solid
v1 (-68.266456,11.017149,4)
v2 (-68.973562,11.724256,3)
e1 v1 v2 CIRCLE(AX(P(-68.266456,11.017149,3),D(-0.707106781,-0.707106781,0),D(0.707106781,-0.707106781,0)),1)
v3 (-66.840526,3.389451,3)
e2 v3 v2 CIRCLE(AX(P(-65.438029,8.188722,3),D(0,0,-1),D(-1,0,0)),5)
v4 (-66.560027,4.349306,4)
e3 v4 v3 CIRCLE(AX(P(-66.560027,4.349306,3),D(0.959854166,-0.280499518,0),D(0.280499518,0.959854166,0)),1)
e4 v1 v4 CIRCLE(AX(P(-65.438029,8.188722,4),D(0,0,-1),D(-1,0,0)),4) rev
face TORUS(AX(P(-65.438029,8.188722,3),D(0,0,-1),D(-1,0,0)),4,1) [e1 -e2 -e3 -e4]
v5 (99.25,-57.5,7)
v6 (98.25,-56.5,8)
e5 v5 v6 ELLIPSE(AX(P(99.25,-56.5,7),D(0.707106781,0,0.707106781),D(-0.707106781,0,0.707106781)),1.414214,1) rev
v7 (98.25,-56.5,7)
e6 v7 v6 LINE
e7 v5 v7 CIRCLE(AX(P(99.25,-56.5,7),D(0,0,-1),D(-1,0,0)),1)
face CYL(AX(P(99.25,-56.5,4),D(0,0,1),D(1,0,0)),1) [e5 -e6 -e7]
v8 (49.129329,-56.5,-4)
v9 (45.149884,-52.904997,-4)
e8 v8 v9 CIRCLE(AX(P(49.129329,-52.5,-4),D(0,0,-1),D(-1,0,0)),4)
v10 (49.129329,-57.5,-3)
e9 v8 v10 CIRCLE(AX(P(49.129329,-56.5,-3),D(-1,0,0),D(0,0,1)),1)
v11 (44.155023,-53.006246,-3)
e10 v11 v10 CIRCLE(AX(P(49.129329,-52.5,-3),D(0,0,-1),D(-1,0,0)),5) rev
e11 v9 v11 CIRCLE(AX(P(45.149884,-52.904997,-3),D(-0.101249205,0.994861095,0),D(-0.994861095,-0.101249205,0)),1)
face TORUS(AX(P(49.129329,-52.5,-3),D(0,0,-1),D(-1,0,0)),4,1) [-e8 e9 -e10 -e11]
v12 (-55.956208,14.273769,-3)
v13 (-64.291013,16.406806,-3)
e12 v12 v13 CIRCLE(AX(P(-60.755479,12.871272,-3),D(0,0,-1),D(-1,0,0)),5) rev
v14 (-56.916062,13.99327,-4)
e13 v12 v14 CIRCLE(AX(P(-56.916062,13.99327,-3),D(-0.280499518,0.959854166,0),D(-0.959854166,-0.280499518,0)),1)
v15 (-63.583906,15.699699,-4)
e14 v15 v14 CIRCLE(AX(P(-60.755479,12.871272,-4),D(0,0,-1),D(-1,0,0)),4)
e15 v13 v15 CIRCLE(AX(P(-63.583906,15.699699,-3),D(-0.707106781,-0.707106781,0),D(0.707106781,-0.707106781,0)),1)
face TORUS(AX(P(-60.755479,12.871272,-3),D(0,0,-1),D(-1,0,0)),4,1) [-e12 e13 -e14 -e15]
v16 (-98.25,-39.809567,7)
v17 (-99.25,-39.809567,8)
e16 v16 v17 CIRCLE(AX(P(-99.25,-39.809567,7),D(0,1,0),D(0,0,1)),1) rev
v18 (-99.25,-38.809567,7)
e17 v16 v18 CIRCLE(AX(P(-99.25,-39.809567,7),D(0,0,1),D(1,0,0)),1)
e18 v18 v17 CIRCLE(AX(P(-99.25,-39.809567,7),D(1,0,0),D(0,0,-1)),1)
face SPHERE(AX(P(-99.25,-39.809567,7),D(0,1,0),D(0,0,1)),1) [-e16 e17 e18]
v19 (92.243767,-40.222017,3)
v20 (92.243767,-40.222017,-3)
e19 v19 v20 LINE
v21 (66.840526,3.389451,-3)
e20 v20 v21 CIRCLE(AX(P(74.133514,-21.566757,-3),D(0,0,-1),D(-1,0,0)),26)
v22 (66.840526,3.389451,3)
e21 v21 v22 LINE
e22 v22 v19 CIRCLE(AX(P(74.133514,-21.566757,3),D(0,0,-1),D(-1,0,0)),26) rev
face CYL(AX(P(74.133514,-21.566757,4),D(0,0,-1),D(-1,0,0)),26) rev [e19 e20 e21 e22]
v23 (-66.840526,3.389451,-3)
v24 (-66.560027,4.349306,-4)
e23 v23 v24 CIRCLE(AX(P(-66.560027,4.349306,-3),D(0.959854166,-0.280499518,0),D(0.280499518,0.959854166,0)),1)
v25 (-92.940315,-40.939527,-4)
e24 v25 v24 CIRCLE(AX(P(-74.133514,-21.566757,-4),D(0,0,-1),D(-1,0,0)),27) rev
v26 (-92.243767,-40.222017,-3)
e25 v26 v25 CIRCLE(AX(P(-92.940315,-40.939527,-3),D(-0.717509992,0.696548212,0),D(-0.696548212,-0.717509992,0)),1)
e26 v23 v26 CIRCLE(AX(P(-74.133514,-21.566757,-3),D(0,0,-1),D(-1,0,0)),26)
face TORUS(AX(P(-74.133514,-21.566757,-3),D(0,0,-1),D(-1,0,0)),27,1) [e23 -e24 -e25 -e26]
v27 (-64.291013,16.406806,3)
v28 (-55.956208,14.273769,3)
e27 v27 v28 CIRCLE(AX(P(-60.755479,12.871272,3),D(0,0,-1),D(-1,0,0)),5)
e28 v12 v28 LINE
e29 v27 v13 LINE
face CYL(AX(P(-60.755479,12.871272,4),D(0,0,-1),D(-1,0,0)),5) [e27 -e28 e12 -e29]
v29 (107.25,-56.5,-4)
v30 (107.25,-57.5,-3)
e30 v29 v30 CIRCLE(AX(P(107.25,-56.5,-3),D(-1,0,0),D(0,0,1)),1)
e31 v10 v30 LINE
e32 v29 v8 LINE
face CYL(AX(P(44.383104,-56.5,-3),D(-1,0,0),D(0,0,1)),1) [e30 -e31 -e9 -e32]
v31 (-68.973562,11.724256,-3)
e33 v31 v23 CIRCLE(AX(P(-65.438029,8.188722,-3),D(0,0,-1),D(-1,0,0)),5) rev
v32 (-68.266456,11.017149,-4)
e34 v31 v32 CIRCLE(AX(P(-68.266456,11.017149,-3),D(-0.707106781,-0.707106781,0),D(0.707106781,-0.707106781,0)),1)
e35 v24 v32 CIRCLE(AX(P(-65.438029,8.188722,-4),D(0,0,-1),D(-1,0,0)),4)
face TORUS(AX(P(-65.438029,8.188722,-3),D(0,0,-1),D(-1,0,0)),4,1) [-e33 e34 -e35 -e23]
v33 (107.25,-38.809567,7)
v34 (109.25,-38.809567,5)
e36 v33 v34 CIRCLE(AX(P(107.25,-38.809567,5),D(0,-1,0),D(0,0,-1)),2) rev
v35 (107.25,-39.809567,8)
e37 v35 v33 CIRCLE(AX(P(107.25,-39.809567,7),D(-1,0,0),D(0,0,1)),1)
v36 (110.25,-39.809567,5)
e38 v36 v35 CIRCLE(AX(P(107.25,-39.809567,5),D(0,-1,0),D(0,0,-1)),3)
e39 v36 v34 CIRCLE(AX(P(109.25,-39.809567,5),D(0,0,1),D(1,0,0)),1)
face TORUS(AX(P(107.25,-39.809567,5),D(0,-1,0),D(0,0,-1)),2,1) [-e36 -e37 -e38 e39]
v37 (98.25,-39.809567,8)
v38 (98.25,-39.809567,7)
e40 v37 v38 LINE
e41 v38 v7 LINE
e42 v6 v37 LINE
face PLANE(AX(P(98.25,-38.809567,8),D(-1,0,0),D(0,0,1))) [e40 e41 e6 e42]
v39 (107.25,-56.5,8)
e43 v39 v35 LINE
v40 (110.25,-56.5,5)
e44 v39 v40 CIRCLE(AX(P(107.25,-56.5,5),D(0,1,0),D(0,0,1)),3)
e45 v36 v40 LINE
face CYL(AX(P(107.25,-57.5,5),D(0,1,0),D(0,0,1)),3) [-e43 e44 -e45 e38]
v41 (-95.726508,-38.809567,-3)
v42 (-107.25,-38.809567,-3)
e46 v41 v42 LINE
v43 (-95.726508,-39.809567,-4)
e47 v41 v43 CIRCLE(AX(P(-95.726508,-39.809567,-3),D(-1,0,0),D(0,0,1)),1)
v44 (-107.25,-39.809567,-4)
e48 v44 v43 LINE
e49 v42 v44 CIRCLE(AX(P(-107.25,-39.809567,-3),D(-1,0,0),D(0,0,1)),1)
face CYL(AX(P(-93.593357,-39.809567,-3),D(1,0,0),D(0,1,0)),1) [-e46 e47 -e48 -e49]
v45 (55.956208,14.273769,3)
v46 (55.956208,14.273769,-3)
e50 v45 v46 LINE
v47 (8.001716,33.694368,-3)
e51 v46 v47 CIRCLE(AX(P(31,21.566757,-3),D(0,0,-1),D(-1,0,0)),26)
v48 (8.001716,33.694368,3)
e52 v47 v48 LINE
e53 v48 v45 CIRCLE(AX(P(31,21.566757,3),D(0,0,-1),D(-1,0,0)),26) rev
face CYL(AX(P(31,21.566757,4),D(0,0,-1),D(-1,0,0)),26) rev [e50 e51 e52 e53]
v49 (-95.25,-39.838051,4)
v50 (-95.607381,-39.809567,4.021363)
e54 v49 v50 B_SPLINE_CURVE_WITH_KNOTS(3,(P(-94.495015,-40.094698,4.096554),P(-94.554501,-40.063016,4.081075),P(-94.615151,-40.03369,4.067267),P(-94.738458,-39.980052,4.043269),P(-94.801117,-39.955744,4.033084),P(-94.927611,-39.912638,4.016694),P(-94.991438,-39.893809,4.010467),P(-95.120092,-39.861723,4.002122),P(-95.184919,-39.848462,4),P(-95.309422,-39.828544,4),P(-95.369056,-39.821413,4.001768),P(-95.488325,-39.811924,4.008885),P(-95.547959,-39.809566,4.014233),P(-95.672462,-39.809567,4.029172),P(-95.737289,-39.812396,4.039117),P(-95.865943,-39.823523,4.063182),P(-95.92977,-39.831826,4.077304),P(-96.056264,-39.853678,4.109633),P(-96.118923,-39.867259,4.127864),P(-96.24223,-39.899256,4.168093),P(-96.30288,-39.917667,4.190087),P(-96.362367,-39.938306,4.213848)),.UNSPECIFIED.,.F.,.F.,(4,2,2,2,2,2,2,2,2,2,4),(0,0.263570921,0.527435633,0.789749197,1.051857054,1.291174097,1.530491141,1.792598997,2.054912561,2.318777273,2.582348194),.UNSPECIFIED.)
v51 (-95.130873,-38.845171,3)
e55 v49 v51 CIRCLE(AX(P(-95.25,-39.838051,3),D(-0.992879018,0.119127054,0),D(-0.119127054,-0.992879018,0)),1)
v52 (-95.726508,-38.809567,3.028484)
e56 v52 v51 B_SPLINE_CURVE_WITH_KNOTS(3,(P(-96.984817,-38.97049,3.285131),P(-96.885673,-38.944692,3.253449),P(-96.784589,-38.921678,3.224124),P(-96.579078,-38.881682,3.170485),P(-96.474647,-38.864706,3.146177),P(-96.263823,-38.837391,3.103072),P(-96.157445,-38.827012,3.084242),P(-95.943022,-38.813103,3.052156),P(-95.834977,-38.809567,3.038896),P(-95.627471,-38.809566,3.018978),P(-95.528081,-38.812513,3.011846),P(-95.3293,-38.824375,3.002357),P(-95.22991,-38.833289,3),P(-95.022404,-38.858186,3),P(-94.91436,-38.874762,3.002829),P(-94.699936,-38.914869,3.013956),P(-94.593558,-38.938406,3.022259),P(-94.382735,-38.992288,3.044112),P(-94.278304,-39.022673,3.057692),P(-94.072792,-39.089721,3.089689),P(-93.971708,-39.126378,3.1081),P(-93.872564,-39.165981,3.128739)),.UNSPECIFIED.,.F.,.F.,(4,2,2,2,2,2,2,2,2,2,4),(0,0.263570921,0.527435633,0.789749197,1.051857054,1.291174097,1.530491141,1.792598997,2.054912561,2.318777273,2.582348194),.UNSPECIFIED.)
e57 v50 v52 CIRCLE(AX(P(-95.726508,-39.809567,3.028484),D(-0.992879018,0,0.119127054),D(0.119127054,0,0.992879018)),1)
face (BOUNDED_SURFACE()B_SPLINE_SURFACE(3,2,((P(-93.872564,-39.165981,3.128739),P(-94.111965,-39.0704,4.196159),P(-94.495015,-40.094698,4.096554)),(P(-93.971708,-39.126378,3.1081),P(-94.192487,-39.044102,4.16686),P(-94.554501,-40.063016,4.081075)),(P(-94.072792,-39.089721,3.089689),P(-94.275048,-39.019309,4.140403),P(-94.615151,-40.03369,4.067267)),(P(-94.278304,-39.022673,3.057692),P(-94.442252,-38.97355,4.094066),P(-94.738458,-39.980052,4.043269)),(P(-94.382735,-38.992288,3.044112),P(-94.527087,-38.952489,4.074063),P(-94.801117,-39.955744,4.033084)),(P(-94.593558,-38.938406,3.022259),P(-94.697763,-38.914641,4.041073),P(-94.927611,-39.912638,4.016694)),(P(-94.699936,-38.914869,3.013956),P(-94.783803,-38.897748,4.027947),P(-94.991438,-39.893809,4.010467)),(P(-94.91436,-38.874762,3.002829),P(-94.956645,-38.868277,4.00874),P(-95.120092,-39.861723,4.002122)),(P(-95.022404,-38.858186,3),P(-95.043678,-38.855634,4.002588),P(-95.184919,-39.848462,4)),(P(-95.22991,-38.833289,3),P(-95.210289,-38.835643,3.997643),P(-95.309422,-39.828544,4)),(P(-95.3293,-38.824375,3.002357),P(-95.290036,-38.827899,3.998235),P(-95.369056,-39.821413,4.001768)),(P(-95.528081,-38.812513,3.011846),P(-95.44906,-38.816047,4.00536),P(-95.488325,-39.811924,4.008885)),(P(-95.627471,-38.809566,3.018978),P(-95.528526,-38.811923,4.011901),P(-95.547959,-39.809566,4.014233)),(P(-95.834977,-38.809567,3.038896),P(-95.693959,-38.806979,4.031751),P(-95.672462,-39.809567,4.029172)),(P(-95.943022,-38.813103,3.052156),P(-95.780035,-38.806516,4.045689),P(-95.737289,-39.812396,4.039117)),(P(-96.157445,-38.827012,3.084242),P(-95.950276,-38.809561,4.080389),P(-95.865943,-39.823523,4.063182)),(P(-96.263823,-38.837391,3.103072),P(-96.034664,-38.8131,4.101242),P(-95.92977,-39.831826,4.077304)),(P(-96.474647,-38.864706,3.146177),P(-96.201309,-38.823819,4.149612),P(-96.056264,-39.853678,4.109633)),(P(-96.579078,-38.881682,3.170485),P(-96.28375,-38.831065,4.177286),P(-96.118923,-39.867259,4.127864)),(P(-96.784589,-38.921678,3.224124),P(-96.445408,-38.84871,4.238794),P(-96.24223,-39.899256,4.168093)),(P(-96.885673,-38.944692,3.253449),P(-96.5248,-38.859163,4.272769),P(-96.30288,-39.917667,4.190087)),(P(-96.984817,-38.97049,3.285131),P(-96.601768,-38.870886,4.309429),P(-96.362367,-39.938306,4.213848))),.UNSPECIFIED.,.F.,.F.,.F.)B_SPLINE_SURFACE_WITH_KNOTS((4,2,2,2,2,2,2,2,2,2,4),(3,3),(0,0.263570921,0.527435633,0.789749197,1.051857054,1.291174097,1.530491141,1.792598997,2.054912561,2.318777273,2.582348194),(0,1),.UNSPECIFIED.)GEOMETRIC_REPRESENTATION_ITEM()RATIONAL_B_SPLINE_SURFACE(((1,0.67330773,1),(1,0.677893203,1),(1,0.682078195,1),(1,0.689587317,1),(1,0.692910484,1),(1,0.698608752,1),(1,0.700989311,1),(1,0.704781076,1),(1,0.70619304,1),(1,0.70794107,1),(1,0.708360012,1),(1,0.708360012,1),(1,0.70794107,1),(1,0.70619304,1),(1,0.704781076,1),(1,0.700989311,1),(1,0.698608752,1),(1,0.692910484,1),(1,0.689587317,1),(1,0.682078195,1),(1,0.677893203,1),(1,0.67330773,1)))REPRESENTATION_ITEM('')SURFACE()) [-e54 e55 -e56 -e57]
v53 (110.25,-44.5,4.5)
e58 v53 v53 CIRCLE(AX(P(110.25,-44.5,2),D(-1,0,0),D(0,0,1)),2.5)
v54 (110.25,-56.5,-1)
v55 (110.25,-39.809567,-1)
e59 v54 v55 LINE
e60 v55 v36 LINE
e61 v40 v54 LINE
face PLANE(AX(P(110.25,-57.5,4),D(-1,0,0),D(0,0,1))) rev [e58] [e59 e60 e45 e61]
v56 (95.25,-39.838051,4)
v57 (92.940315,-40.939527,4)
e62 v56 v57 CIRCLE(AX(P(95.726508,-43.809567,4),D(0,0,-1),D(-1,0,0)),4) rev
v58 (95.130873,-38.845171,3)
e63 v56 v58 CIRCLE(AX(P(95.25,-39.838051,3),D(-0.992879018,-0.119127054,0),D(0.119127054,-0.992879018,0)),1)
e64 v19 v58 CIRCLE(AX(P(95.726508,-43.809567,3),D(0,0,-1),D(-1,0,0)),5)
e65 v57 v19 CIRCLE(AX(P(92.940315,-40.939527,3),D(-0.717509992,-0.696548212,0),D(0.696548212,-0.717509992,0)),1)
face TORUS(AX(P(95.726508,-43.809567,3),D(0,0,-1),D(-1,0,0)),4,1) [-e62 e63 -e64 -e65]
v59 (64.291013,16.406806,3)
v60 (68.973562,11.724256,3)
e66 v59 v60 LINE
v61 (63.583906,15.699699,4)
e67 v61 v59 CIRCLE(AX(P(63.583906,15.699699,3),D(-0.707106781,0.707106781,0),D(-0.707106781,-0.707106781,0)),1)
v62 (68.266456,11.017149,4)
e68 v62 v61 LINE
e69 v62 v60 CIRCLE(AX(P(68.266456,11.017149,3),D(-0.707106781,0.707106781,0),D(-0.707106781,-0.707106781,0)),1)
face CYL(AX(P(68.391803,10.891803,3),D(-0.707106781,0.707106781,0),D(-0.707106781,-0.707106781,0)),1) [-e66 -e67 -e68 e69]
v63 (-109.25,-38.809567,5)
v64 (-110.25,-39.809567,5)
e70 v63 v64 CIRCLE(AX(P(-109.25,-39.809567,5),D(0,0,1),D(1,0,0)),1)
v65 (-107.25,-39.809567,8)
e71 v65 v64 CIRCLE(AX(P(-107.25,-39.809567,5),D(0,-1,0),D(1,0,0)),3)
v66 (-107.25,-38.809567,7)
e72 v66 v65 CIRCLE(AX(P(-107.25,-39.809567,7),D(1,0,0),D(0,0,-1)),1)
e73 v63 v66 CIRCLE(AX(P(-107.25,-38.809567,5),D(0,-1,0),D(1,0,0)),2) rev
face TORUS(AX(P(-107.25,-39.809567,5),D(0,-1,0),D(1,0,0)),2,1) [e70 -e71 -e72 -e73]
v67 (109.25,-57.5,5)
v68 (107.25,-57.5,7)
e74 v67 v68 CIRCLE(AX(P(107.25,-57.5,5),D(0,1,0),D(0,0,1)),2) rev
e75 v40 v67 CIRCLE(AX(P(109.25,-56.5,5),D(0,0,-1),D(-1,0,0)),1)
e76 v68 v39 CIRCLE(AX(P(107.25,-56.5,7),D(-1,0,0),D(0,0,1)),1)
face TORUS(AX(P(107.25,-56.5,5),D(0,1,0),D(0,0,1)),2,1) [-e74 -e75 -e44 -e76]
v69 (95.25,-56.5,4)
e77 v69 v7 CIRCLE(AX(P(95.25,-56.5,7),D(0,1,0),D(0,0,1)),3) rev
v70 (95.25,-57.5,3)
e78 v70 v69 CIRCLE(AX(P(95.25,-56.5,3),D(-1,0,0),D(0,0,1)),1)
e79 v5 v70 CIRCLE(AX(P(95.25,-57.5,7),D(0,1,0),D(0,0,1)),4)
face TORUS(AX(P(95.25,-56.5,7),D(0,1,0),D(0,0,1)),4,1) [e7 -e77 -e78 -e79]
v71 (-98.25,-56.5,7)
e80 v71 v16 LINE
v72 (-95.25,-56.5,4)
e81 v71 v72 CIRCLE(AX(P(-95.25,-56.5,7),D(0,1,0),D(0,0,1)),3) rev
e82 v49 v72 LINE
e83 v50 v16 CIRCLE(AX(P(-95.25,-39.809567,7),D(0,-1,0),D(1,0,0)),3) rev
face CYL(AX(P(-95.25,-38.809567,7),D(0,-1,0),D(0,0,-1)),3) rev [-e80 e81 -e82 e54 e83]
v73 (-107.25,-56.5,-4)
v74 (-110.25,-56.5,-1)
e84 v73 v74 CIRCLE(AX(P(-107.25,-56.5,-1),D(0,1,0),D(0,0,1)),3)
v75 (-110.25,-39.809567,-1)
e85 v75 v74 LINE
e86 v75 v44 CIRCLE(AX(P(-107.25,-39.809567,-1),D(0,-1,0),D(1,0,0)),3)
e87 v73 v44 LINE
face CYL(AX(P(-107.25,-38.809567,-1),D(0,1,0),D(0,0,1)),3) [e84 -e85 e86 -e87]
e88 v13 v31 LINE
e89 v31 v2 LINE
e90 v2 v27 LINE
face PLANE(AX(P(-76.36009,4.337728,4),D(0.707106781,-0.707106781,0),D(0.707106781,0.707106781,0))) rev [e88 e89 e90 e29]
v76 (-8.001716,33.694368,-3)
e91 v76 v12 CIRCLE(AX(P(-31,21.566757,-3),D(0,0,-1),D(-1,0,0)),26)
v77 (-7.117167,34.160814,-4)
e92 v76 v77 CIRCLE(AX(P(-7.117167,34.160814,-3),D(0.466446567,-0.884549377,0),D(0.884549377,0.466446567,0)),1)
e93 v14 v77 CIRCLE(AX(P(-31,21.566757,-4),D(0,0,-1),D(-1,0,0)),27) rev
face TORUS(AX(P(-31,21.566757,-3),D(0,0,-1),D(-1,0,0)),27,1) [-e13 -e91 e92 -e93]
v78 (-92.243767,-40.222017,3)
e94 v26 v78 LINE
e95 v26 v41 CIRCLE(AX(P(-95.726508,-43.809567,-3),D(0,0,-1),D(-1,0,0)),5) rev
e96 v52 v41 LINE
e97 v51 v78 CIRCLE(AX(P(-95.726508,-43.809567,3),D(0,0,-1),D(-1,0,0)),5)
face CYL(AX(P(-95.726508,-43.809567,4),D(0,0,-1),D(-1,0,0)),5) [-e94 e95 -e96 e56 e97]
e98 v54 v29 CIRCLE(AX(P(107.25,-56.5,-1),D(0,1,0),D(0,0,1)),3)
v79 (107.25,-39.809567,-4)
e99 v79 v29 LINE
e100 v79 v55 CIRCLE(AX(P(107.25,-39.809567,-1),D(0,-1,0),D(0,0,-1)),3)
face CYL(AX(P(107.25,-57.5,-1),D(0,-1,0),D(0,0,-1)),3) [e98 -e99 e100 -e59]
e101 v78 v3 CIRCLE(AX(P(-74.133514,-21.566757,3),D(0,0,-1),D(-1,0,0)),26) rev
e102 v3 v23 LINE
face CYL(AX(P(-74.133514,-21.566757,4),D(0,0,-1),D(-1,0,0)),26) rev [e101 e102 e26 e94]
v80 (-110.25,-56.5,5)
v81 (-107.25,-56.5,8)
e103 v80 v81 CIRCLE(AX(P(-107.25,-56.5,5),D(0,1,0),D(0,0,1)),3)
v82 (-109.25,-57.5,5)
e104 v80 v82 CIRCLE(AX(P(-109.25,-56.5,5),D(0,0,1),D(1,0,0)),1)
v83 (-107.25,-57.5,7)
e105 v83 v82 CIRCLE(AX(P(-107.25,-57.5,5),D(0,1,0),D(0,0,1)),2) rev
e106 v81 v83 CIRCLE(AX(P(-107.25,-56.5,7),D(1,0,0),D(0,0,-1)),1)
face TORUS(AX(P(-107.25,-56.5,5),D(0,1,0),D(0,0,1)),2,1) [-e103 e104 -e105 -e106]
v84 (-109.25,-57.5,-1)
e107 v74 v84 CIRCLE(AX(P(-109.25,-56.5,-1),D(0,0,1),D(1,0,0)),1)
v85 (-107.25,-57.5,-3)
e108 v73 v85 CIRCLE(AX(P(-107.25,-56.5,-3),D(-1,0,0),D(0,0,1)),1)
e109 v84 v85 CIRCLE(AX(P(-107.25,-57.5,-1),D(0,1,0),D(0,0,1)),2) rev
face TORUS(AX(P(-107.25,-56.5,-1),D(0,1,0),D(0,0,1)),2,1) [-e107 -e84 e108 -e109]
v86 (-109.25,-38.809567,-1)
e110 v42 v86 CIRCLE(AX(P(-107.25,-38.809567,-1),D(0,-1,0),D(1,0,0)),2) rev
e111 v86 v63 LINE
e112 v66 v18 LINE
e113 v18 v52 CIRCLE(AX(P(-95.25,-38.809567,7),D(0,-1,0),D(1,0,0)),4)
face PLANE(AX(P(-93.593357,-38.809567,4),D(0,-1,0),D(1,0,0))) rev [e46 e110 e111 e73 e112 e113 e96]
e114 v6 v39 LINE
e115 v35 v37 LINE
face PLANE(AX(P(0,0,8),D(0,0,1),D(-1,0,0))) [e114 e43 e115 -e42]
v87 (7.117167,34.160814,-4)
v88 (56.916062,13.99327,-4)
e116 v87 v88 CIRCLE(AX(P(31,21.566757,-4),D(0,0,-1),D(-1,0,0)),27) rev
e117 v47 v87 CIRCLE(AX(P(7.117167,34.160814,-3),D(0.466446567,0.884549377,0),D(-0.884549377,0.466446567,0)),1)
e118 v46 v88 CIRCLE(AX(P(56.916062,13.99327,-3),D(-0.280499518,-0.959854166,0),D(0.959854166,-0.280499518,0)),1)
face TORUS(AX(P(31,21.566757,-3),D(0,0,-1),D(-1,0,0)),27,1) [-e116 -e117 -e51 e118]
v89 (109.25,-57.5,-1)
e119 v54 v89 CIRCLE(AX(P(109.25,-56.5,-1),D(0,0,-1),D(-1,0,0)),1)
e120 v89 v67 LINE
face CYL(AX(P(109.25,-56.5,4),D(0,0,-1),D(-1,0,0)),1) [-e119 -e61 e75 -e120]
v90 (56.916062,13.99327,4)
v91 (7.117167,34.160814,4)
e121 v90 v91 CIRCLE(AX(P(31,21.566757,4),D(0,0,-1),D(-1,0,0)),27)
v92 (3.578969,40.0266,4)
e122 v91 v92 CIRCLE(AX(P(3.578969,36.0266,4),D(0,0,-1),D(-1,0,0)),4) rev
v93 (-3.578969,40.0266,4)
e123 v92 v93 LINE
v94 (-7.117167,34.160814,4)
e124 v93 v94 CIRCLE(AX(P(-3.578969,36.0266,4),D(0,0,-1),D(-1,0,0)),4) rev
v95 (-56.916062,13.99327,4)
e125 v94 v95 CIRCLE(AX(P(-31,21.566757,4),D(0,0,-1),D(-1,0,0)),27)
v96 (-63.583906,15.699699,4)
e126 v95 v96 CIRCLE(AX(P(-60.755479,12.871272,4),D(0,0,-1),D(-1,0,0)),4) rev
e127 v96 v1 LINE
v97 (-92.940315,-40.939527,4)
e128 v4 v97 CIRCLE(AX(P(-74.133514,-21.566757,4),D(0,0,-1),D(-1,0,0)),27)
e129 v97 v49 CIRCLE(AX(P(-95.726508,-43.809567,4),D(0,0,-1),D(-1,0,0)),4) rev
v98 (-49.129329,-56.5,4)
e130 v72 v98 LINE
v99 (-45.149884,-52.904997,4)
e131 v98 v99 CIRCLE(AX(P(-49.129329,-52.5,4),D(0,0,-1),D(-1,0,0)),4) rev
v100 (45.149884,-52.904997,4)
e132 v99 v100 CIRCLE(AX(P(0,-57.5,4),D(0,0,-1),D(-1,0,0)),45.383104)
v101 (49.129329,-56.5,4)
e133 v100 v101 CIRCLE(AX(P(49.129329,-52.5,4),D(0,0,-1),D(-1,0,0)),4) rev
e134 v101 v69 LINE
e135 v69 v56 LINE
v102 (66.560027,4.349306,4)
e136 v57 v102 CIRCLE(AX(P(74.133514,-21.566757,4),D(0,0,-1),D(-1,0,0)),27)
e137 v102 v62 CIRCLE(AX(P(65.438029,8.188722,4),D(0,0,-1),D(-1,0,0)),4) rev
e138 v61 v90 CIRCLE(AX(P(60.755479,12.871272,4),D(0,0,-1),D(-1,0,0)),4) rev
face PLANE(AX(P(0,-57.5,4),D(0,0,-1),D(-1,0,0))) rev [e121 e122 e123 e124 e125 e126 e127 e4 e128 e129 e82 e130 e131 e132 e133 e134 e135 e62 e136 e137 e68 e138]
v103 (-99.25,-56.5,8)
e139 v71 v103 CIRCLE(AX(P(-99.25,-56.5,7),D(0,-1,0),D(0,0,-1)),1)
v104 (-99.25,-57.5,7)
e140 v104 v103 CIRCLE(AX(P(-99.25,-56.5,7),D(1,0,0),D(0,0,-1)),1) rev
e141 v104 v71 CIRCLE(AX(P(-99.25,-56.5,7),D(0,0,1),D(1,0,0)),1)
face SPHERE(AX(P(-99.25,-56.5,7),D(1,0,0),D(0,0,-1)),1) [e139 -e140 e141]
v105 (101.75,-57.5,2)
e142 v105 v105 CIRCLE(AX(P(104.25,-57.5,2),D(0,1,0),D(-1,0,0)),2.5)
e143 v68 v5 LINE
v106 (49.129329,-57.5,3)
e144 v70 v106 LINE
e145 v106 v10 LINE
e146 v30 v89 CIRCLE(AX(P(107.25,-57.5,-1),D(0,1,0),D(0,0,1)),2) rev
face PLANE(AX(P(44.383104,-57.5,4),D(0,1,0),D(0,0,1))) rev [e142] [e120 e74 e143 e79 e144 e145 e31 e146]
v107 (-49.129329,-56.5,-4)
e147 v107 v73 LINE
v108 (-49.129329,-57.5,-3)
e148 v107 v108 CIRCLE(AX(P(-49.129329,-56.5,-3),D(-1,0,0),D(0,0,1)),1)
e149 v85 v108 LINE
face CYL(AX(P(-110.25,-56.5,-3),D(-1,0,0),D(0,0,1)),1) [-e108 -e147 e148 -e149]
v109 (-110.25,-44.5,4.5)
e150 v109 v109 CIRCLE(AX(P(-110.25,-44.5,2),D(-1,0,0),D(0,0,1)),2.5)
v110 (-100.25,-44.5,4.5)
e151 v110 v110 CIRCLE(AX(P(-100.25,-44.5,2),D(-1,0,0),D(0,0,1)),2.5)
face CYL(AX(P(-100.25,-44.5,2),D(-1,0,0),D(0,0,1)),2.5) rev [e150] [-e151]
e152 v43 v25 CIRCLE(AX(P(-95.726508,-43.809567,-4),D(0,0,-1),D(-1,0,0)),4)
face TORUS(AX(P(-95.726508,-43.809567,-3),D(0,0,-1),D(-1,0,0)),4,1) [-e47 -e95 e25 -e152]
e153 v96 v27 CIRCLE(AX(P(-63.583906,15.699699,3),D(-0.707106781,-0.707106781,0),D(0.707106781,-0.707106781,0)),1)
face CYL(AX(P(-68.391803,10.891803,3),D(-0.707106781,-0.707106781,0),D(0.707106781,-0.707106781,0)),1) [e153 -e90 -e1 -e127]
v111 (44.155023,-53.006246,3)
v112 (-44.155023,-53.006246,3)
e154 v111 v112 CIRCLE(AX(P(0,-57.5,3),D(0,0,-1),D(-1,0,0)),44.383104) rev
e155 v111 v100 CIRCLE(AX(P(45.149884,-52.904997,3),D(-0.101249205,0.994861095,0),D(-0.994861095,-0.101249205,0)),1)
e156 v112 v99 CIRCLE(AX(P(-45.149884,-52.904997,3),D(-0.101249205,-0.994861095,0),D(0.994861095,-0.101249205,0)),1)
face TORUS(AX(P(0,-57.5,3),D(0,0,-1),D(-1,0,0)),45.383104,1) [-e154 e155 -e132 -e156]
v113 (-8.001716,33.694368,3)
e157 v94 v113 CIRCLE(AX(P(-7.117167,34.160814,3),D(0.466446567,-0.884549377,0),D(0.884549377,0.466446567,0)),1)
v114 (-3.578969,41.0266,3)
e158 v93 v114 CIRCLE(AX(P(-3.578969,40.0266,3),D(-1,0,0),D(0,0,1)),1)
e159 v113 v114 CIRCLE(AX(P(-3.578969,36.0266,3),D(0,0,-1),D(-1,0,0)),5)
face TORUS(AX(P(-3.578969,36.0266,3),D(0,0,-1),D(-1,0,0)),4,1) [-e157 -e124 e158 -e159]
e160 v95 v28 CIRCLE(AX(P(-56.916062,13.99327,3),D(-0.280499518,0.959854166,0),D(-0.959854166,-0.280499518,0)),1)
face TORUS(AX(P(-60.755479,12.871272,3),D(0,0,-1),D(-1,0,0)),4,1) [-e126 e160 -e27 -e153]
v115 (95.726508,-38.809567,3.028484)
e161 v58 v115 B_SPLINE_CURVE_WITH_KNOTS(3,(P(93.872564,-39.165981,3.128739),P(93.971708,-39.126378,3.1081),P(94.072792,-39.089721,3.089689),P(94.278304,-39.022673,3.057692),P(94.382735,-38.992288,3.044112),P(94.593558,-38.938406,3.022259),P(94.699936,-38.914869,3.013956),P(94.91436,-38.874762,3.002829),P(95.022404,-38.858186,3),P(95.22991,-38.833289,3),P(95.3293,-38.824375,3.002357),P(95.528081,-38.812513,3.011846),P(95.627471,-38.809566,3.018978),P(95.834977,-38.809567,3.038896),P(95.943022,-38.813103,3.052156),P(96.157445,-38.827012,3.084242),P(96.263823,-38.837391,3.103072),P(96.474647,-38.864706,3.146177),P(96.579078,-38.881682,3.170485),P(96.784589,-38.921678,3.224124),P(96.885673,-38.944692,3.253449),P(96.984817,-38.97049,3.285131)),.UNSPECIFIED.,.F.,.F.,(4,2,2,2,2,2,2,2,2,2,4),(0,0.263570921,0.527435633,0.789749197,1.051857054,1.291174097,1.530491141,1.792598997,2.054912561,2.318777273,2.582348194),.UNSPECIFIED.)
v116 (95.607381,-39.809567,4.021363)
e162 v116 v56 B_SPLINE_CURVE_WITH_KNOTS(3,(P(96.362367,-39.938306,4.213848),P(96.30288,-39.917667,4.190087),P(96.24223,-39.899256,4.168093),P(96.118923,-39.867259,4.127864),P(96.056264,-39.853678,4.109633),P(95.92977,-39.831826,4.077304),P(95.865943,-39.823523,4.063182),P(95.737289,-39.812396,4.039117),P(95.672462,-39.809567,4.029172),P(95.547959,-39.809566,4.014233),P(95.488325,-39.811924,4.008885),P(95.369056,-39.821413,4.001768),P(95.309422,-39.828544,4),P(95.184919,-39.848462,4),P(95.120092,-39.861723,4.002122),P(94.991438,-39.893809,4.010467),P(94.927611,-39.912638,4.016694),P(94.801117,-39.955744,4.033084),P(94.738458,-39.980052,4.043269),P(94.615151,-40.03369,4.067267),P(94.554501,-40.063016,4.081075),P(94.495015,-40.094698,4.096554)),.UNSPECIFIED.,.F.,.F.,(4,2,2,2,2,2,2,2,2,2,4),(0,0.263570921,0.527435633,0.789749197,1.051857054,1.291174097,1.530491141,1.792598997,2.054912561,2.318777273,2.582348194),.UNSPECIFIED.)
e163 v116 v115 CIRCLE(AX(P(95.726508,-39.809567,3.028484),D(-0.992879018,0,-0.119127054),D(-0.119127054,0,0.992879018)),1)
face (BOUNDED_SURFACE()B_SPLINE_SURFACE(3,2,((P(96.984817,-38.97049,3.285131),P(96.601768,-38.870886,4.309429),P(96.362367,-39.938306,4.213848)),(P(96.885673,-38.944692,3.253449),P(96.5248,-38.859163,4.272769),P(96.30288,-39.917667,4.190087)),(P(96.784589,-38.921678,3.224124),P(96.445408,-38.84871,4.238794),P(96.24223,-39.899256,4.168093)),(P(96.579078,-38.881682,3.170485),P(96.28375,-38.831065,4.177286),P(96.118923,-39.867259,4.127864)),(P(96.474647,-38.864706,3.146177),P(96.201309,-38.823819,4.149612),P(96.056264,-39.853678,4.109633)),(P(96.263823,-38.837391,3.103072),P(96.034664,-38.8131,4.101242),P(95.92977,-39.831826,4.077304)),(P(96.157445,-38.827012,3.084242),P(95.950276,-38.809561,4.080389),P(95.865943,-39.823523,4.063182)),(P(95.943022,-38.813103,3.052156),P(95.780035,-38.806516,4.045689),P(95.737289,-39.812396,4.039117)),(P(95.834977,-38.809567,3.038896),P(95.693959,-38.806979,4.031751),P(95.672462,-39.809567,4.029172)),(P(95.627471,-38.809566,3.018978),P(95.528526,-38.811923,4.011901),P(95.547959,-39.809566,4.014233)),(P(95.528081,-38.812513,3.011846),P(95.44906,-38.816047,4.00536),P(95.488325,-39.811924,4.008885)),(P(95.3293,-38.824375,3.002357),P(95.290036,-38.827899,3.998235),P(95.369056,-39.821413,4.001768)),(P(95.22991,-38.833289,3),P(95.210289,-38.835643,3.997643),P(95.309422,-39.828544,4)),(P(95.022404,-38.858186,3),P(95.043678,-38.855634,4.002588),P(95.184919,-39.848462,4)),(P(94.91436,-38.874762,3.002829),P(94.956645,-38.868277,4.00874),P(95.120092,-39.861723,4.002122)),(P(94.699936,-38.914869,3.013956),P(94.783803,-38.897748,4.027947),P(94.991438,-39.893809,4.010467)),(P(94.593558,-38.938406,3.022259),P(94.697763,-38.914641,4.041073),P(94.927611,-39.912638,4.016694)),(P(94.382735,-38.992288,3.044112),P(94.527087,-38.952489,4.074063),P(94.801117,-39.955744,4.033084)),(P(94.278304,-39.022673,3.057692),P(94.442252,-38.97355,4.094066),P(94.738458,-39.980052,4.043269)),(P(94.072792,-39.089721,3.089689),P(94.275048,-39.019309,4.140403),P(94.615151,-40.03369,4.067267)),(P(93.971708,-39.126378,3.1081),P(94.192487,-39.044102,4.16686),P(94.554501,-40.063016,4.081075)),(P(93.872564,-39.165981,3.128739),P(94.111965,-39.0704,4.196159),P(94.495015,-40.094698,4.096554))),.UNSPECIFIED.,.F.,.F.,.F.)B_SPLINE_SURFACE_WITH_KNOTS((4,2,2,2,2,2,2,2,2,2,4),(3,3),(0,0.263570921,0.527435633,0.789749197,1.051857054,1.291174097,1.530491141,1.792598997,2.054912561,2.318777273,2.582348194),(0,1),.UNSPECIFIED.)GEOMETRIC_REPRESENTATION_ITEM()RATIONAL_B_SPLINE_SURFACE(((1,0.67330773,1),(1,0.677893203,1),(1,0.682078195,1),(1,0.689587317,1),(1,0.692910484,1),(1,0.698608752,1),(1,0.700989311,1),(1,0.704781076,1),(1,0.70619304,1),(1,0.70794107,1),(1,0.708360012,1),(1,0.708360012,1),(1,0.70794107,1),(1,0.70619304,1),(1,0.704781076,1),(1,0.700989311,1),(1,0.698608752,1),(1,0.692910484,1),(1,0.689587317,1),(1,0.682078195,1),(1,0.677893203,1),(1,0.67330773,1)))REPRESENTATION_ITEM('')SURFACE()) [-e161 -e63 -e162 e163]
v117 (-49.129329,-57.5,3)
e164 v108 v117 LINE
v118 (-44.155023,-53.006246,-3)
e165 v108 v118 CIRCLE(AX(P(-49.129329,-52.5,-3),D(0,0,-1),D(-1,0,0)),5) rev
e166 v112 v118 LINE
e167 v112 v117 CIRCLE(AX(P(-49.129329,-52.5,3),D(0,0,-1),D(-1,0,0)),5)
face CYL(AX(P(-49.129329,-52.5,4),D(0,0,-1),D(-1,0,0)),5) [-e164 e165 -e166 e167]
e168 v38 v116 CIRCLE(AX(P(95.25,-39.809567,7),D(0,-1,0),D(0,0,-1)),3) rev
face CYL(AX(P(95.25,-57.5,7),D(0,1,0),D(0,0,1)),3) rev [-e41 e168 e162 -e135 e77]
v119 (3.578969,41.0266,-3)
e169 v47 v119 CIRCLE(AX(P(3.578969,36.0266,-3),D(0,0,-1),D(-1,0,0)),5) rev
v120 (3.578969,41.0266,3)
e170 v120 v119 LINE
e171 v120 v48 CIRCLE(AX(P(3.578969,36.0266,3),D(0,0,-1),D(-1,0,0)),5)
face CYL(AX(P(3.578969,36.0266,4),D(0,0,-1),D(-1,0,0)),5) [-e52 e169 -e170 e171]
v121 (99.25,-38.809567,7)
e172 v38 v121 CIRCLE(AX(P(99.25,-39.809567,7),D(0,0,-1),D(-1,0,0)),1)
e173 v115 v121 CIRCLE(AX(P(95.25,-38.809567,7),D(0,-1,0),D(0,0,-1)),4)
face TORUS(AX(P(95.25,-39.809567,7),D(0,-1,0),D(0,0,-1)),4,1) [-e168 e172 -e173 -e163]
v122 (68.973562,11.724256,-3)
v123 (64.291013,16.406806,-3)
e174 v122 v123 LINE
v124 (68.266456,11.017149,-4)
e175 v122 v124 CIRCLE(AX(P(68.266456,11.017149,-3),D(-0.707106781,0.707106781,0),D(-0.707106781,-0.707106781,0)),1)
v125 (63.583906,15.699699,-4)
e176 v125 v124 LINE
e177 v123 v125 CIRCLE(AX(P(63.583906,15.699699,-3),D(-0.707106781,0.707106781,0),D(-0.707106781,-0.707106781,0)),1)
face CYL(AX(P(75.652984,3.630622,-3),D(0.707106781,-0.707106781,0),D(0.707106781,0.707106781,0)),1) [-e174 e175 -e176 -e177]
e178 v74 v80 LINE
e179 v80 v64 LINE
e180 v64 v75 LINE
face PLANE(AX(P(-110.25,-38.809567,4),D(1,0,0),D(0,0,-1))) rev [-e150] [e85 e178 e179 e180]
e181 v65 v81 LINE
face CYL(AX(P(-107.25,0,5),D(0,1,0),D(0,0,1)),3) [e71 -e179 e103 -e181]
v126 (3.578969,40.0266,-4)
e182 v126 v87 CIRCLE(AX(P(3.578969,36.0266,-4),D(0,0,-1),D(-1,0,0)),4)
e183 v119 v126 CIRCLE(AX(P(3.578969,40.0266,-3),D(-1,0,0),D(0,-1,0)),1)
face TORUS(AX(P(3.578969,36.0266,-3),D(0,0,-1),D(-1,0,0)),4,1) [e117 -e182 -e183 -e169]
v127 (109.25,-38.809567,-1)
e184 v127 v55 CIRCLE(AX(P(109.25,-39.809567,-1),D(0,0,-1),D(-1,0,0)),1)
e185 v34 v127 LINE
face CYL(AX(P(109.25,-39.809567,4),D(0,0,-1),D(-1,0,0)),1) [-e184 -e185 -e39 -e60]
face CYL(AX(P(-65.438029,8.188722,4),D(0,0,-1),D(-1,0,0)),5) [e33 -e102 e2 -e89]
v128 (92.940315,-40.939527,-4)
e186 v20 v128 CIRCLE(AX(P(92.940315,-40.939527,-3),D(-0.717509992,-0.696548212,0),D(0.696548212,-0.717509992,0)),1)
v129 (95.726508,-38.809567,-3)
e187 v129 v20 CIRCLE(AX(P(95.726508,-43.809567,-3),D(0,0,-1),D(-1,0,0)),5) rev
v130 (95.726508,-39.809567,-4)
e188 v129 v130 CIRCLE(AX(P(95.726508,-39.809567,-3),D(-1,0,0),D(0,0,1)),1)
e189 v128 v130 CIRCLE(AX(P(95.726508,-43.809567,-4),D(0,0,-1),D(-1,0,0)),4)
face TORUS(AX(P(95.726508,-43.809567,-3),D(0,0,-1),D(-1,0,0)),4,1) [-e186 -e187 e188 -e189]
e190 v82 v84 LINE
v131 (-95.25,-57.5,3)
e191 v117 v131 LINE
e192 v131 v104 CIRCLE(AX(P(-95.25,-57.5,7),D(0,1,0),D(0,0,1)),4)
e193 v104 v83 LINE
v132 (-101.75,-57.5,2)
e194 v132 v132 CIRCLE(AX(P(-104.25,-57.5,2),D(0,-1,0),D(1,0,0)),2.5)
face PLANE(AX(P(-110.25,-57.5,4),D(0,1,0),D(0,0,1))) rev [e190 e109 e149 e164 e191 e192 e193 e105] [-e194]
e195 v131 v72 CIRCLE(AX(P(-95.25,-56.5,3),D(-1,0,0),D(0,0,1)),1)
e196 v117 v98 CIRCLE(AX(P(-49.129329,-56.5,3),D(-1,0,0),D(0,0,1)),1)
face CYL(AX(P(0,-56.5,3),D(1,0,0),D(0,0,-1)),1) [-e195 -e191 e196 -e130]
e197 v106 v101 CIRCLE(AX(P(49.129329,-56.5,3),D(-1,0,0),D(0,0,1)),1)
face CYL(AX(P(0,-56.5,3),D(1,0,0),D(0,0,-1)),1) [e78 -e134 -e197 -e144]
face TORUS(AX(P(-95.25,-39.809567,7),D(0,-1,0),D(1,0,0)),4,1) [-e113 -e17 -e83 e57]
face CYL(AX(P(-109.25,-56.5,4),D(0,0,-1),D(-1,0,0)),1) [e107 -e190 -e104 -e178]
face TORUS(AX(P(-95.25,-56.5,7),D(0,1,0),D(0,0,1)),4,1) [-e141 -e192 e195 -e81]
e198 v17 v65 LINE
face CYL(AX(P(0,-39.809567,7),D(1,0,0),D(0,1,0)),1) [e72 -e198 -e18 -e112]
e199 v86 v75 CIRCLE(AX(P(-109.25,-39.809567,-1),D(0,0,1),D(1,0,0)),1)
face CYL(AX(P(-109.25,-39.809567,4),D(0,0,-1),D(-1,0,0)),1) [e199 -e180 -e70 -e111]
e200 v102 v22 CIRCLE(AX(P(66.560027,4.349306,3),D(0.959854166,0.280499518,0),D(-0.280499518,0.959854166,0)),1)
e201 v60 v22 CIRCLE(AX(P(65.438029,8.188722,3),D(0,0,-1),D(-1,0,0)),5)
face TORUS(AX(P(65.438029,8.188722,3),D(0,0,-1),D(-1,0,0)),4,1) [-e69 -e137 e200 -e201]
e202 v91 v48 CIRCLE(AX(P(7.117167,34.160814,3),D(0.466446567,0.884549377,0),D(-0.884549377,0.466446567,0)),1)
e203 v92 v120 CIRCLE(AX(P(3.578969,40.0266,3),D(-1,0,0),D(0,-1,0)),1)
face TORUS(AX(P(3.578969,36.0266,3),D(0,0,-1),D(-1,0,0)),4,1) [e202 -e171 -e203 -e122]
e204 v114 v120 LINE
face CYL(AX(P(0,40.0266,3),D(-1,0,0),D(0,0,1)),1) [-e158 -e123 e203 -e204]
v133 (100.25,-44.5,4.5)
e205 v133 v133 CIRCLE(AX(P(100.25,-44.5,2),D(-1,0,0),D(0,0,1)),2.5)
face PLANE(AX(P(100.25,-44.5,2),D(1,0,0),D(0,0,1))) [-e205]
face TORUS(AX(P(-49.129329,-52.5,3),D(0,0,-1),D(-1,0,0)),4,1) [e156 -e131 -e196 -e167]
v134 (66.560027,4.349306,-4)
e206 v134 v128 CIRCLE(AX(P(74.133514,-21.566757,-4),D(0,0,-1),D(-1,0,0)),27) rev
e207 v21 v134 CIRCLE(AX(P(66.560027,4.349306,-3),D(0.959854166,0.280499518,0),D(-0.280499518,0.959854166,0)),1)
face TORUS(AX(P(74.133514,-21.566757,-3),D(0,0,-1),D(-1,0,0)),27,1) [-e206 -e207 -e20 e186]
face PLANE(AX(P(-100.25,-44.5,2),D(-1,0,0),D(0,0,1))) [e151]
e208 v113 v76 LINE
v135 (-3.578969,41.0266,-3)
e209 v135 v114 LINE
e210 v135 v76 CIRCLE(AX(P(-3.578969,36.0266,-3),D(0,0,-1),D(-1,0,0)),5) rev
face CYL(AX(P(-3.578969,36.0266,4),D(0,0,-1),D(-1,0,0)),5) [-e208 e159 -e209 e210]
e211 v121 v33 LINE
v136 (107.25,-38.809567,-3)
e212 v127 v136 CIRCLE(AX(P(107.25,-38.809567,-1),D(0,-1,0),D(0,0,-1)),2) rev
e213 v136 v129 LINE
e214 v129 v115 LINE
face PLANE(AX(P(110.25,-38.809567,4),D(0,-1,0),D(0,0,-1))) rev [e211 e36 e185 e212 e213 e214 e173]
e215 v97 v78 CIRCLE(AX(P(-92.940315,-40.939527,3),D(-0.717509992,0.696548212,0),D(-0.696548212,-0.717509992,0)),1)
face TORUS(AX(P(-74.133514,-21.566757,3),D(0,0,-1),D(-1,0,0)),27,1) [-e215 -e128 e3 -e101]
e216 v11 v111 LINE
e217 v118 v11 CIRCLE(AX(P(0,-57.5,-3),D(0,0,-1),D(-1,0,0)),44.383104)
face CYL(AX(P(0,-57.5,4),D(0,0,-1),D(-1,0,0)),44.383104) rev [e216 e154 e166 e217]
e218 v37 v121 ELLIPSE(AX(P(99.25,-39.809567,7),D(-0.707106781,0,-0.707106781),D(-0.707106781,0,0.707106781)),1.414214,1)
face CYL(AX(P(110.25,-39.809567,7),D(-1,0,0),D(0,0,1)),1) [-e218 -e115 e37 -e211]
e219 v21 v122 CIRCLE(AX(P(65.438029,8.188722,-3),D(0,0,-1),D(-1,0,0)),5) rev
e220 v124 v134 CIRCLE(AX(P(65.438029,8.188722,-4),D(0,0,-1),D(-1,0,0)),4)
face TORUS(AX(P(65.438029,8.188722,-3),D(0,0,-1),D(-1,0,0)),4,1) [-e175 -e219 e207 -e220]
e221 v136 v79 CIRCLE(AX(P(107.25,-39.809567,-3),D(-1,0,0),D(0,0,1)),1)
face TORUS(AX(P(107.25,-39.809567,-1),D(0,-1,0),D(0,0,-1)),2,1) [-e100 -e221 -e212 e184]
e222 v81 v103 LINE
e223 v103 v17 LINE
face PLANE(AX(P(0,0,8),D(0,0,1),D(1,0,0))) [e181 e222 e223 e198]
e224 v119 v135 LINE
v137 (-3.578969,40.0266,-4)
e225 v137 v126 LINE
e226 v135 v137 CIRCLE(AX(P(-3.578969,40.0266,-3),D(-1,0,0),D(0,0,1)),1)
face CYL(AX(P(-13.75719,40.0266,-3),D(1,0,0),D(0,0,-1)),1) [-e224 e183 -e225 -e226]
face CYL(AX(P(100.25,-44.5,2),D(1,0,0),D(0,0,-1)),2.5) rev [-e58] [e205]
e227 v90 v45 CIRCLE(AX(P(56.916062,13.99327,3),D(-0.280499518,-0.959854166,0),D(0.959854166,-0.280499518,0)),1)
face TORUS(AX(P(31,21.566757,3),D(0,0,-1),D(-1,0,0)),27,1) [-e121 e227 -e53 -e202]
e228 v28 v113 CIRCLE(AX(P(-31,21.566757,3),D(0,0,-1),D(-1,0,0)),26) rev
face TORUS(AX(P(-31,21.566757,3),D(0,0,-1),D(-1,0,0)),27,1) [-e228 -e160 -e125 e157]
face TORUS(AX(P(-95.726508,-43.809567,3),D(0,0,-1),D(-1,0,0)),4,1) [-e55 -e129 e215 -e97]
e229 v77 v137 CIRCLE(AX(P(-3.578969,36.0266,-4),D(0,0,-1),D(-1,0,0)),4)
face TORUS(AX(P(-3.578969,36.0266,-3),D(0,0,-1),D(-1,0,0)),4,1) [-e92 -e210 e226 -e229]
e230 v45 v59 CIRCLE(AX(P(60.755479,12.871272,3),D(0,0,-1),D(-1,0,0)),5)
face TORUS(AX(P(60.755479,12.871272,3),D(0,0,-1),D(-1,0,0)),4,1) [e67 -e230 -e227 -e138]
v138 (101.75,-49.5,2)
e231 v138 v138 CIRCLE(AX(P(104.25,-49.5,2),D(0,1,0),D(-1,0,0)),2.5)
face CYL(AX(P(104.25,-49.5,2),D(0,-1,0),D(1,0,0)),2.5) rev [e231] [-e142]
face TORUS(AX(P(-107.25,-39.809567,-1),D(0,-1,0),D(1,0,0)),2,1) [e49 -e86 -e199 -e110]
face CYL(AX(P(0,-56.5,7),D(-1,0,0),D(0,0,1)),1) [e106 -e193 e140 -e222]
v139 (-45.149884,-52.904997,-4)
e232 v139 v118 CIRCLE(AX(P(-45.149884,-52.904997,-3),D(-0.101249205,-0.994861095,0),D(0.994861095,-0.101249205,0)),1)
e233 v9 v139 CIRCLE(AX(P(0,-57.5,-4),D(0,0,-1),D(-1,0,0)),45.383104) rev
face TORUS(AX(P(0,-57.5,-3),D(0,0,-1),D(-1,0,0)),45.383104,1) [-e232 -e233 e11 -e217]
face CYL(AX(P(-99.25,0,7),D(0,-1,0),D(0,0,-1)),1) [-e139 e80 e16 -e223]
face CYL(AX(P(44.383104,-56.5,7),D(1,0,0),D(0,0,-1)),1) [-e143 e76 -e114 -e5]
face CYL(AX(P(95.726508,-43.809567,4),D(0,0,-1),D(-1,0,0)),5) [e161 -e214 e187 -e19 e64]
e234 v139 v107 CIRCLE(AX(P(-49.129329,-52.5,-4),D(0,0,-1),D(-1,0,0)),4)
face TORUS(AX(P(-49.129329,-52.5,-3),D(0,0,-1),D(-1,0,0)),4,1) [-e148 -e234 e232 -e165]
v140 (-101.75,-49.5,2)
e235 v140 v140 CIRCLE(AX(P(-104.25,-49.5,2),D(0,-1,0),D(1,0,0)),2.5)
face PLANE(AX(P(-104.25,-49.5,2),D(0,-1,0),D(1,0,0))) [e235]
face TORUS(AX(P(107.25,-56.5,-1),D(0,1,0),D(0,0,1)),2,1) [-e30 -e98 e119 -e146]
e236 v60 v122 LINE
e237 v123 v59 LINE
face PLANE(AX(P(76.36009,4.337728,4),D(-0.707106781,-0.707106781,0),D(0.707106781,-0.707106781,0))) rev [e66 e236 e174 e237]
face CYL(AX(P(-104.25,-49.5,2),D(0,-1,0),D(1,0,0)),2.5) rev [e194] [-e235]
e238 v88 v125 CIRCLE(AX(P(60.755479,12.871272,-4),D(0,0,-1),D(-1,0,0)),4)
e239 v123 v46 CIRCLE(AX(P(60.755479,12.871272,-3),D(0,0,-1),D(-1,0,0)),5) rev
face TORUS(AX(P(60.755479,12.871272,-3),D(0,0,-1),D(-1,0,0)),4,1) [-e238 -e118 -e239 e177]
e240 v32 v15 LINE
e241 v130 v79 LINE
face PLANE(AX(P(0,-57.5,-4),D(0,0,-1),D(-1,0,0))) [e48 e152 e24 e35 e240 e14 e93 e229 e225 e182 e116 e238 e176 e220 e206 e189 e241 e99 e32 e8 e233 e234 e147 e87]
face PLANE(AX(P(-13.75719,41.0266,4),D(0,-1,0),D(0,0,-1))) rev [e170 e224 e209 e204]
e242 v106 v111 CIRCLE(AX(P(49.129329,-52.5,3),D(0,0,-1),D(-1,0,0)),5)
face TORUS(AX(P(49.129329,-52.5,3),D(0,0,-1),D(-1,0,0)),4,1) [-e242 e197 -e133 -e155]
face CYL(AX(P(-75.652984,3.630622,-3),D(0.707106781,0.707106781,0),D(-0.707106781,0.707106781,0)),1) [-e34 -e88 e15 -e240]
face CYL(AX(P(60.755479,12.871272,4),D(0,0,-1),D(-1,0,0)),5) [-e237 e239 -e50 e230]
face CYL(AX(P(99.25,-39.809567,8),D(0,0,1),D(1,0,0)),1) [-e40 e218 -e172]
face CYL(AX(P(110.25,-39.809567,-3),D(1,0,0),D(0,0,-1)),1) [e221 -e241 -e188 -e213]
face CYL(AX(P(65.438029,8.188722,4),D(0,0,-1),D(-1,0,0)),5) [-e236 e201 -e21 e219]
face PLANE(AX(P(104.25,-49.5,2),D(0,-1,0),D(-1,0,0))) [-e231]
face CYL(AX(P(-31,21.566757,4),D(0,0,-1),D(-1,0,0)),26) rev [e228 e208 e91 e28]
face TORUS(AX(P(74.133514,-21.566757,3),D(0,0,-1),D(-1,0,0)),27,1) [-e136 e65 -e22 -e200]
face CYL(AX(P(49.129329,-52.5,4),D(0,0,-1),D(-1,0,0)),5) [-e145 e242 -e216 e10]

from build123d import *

# Parameters (mm, degrees)
BOSS_EXTRUDE1_DEPTH = 4
SKETCH4_W           = 12
SKETCH4_H           = 18.69043342
BOSS_EXTRUDE2_DEPTH = 4
SKETCH5_R           = 2.5
CUT_EXTRUDE1_DEPTH  = 8
SKETCH6_R           = 2.5
CUT_EXTRUDE2_DEPTH  = 10
FILLET2_R           = 5
FILLET3_R           = 3
FILLET4_R           = 1


with BuildPart() as part:
    # Sketch3 → Boss-Extrude1 (new, symmetric)
    with BuildSketch(Plane.XY):
        with BuildLine():
            Line((-13.757190246, 41.026600397), (13.757190246, 41.026600397))
            ThreePointArc((13.757190246, 41.026600397), (21.35621817, -2.57858376), (56.904485258, 23.793333459))
            Line((56.904485258, 23.793333459), (76.360090285, 4.337728432))
            ThreePointArc((76.360090285, 4.337728432), (49.988173066, -31.210538656), (93.593357223, -38.80956658))
            Line((93.593357223, -38.80956658), (110.25, -38.80956658))
            Line((110.25, -38.80956658), (110.25, -57.5))
            Line((110.25, -57.5), (44.38310392, -57.5))
            ThreePointArc((44.38310392, -57.5), (0, -13.11689608), (-44.38310392, -57.5))
            Line((-44.38310392, -57.5), (-110.25, -57.5))
            Line((-110.25, -57.5), (-110.25, -38.80956658))
            Line((-110.25, -38.80956658), (-93.593357223, -38.80956658))
            ThreePointArc((-93.593357223, -38.80956658), (-49.988173066, -31.210538656), (-76.360090285, 4.337728432))
            Line((-76.360090285, 4.337728432), (-56.904485258, 23.793333459))
            ThreePointArc((-56.904485258, 23.793333459), (-21.35621817, -2.57858376), (-13.757190246, 41.026600397))
        make_face()
    extrude(amount=BOSS_EXTRUDE1_DEPTH, both=True)

    # Sketch4 → Boss-Extrude2 (add)
    with BuildSketch(Plane.XY.offset(4)):
        with Locations((-104.25, -48.15478329)):
            Rectangle(SKETCH4_W, SKETCH4_H)
    boss_extrude2 = extrude(amount=BOSS_EXTRUDE2_DEPTH)

    # Sketch5 → Cut-Extrude1 (cut)
    with BuildSketch(Plane(origin=(0, -57.5, 0), x_dir=(-1, 0, 0), z_dir=(0, -1, 0))):
        with Locations(Location((104.25, -2, 0), (0, 0, 180))):
            Circle(SKETCH5_R)
    cut_extrude1 = extrude(amount=-CUT_EXTRUDE1_DEPTH, mode=Mode.SUBTRACT)

    # Sketch6 → Cut-Extrude2 (cut)
    with BuildSketch(Plane.ZY.offset(110.25)):
        with Locations((2, -44.5)):
            Circle(SKETCH6_R)
    cut_extrude2 = extrude(amount=-CUT_EXTRUDE2_DEPTH, mode=Mode.SUBTRACT)

    # Mirror1: Boss-Extrude2, Cut-Extrude1, Cut-Extrude2 across plane
    add(boss_extrude2.mirror(Plane(origin=(0, 0, 0), x_dir=(0, 0, 1), z_dir=(1, 0, 0))))
    add(cut_extrude1.mirror(Plane(origin=(0, 0, 0), x_dir=(0, 0, 1), z_dir=(1, 0, 0))), mode=Mode.SUBTRACT)
    add(cut_extrude2.mirror(Plane(origin=(0, 0, 0), x_dir=(0, 0, 1), z_dir=(1, 0, 0))), mode=Mode.SUBTRACT)

    # Fillet2
    fillet2_edges = [part.edges().sort_by_distance(p)[0] for p in [
        (-44.38310392, -57.5, 0),
        (-93.593357223, -38.80956658, 0),
        (-76.360090285, 4.337728432, 0),
        (-56.904485258, 23.793333459, 0),
        (-13.757190246, 41.026600397, 0),
        (13.757190246, 41.026600397, 0),
        (56.904485258, 23.793333459, 0),
        (76.360090285, 4.337728432, 0),
        (93.593357223, -38.80956658, 0),
        (44.38310392, -57.5, 0),
    ]]
    fillet(fillet2_edges, radius=FILLET2_R)

    # Fillet3
    fillet3_edges = [part.edges().sort_by_distance(p)[0] for p in [
        (-110.25, -48.15478329, -4),
        (-110.25, -48.15478329, 8),
        (110.25, -48.15478329, 8),
        (110.25, -48.15478329, -4),
        (98.25, -48.15478329, 4),
        (-98.25, -48.15478329, 4),
    ]]
    fillet(fillet3_edges, radius=FILLET3_R)

    # Fillet4
    fillet4_edges = [part.edges().sort_by_distance(p)[0] for p in [
        (-102.75, -57.5, 8),
        (102.75, -57.5, 8),
        (109.371320344, -57.5, 7.121320344),
        (110.25, -57.5, 2),
        (109.371320344, -57.5, -3.121320344),
        (78.189664422, -57.5, -4),
        (45.777555442, -56.21020418, -4),
        (0, -13.11689608, -4),
        (-45.777555442, -56.21020418, -4),
        (-78.189664422, -57.5, -4),
        (-109.371320344, -57.5, -3.121320344),
        (-110.25, -57.5, 2),
        (98.25, -57.5, 7.5),
        (97.371320344, -57.5, 4.878679656),
        (72.189664422, -57.5, 4),
        (45.777555442, -56.21020418, 4),
        (0, -13.11689608, 4),
        (-45.777555442, -56.21020418, 4),
        (-72.189664422, -57.5, 4),
        (98.25, -38.80956658, 7.5),
        (97.53358541, -38.80956658, 5.054431272),
        (93.628479419, -39.27103431, 4),
        (51.667019738, -34.653263281, 4),
        (70.281919711, 6.949077724, 4),
        (66.632287772, 14.065530945, 4),
        (59.51583455, 17.715162885, 4),
        (21.240477683, -2.532034101, 4),
        (7.860392218, 38.609122016, 4),
        (0, 41.026600397, 4),
        (-7.860392218, 38.609122016, 4),
        (-21.240477683, -2.532034101, 4),
        (-59.51583455, 17.715162885, 4),
        (-66.632287772, 14.065530945, 4),
        (-70.281919711, 6.949077724, 4),
        (-51.667019738, -34.653263281, 4),
        (-93.628479419, -39.27103431, 4),
        (102.75, -38.80956658, 8),
        (109.371320344, -38.80956658, 7.121320344),
        (110.25, -38.80956658, 2),
        (109.371320344, -38.80956658, -3.121320344),
        (101.488254108, -38.80956658, -4),
        (93.847379403, -39.176114853, -4),
        (51.667019738, -34.653263281, -4),
        (70.281919711, 6.949077724, -4),
        (66.632287772, 14.065530945, -4),
        (59.51583455, 17.715162885, -4),
        (21.240477683, -2.532034101, -4),
        (7.860392218, 38.609122016, -4),
        (0, 41.026600397, -4),
        (-7.860392218, 38.609122016, -4),
        (-21.240477683, -2.532034101, -4),
        (-59.51583455, 17.715162885, -4),
        (-66.632287772, 14.065530945, -4),
        (-70.281919711, 6.949077724, -4),
        (-51.667019738, -34.653263281, -4),
        (-93.847379403, -39.176114853, -4),
        (-101.488254108, -38.80956658, -4),
        (-109.371320344, -38.80956658, -3.121320344),
        (-110.25, -38.80956658, 2),
        (-109.371320344, -38.80956658, 7.121320344),
        (-109.371320344, -57.5, 7.121320344),
        (-97.371320344, -57.5, 4.878679656),
        (-97.53358541, -38.80956658, 5.054431272),
        (-102.75, -38.80956658, 8),
        (-98.25, -48.15478329, 8),
        (95.48918045, -38.815202204, 4.009549779),
        (-95.489157981, -38.815203301, 4.009547981),
    ]]
    fillet(fillet4_edges, radius=FILLET4_R - 0.0001)  # a hair under: the kernel refuses the full size


solid = part.part
